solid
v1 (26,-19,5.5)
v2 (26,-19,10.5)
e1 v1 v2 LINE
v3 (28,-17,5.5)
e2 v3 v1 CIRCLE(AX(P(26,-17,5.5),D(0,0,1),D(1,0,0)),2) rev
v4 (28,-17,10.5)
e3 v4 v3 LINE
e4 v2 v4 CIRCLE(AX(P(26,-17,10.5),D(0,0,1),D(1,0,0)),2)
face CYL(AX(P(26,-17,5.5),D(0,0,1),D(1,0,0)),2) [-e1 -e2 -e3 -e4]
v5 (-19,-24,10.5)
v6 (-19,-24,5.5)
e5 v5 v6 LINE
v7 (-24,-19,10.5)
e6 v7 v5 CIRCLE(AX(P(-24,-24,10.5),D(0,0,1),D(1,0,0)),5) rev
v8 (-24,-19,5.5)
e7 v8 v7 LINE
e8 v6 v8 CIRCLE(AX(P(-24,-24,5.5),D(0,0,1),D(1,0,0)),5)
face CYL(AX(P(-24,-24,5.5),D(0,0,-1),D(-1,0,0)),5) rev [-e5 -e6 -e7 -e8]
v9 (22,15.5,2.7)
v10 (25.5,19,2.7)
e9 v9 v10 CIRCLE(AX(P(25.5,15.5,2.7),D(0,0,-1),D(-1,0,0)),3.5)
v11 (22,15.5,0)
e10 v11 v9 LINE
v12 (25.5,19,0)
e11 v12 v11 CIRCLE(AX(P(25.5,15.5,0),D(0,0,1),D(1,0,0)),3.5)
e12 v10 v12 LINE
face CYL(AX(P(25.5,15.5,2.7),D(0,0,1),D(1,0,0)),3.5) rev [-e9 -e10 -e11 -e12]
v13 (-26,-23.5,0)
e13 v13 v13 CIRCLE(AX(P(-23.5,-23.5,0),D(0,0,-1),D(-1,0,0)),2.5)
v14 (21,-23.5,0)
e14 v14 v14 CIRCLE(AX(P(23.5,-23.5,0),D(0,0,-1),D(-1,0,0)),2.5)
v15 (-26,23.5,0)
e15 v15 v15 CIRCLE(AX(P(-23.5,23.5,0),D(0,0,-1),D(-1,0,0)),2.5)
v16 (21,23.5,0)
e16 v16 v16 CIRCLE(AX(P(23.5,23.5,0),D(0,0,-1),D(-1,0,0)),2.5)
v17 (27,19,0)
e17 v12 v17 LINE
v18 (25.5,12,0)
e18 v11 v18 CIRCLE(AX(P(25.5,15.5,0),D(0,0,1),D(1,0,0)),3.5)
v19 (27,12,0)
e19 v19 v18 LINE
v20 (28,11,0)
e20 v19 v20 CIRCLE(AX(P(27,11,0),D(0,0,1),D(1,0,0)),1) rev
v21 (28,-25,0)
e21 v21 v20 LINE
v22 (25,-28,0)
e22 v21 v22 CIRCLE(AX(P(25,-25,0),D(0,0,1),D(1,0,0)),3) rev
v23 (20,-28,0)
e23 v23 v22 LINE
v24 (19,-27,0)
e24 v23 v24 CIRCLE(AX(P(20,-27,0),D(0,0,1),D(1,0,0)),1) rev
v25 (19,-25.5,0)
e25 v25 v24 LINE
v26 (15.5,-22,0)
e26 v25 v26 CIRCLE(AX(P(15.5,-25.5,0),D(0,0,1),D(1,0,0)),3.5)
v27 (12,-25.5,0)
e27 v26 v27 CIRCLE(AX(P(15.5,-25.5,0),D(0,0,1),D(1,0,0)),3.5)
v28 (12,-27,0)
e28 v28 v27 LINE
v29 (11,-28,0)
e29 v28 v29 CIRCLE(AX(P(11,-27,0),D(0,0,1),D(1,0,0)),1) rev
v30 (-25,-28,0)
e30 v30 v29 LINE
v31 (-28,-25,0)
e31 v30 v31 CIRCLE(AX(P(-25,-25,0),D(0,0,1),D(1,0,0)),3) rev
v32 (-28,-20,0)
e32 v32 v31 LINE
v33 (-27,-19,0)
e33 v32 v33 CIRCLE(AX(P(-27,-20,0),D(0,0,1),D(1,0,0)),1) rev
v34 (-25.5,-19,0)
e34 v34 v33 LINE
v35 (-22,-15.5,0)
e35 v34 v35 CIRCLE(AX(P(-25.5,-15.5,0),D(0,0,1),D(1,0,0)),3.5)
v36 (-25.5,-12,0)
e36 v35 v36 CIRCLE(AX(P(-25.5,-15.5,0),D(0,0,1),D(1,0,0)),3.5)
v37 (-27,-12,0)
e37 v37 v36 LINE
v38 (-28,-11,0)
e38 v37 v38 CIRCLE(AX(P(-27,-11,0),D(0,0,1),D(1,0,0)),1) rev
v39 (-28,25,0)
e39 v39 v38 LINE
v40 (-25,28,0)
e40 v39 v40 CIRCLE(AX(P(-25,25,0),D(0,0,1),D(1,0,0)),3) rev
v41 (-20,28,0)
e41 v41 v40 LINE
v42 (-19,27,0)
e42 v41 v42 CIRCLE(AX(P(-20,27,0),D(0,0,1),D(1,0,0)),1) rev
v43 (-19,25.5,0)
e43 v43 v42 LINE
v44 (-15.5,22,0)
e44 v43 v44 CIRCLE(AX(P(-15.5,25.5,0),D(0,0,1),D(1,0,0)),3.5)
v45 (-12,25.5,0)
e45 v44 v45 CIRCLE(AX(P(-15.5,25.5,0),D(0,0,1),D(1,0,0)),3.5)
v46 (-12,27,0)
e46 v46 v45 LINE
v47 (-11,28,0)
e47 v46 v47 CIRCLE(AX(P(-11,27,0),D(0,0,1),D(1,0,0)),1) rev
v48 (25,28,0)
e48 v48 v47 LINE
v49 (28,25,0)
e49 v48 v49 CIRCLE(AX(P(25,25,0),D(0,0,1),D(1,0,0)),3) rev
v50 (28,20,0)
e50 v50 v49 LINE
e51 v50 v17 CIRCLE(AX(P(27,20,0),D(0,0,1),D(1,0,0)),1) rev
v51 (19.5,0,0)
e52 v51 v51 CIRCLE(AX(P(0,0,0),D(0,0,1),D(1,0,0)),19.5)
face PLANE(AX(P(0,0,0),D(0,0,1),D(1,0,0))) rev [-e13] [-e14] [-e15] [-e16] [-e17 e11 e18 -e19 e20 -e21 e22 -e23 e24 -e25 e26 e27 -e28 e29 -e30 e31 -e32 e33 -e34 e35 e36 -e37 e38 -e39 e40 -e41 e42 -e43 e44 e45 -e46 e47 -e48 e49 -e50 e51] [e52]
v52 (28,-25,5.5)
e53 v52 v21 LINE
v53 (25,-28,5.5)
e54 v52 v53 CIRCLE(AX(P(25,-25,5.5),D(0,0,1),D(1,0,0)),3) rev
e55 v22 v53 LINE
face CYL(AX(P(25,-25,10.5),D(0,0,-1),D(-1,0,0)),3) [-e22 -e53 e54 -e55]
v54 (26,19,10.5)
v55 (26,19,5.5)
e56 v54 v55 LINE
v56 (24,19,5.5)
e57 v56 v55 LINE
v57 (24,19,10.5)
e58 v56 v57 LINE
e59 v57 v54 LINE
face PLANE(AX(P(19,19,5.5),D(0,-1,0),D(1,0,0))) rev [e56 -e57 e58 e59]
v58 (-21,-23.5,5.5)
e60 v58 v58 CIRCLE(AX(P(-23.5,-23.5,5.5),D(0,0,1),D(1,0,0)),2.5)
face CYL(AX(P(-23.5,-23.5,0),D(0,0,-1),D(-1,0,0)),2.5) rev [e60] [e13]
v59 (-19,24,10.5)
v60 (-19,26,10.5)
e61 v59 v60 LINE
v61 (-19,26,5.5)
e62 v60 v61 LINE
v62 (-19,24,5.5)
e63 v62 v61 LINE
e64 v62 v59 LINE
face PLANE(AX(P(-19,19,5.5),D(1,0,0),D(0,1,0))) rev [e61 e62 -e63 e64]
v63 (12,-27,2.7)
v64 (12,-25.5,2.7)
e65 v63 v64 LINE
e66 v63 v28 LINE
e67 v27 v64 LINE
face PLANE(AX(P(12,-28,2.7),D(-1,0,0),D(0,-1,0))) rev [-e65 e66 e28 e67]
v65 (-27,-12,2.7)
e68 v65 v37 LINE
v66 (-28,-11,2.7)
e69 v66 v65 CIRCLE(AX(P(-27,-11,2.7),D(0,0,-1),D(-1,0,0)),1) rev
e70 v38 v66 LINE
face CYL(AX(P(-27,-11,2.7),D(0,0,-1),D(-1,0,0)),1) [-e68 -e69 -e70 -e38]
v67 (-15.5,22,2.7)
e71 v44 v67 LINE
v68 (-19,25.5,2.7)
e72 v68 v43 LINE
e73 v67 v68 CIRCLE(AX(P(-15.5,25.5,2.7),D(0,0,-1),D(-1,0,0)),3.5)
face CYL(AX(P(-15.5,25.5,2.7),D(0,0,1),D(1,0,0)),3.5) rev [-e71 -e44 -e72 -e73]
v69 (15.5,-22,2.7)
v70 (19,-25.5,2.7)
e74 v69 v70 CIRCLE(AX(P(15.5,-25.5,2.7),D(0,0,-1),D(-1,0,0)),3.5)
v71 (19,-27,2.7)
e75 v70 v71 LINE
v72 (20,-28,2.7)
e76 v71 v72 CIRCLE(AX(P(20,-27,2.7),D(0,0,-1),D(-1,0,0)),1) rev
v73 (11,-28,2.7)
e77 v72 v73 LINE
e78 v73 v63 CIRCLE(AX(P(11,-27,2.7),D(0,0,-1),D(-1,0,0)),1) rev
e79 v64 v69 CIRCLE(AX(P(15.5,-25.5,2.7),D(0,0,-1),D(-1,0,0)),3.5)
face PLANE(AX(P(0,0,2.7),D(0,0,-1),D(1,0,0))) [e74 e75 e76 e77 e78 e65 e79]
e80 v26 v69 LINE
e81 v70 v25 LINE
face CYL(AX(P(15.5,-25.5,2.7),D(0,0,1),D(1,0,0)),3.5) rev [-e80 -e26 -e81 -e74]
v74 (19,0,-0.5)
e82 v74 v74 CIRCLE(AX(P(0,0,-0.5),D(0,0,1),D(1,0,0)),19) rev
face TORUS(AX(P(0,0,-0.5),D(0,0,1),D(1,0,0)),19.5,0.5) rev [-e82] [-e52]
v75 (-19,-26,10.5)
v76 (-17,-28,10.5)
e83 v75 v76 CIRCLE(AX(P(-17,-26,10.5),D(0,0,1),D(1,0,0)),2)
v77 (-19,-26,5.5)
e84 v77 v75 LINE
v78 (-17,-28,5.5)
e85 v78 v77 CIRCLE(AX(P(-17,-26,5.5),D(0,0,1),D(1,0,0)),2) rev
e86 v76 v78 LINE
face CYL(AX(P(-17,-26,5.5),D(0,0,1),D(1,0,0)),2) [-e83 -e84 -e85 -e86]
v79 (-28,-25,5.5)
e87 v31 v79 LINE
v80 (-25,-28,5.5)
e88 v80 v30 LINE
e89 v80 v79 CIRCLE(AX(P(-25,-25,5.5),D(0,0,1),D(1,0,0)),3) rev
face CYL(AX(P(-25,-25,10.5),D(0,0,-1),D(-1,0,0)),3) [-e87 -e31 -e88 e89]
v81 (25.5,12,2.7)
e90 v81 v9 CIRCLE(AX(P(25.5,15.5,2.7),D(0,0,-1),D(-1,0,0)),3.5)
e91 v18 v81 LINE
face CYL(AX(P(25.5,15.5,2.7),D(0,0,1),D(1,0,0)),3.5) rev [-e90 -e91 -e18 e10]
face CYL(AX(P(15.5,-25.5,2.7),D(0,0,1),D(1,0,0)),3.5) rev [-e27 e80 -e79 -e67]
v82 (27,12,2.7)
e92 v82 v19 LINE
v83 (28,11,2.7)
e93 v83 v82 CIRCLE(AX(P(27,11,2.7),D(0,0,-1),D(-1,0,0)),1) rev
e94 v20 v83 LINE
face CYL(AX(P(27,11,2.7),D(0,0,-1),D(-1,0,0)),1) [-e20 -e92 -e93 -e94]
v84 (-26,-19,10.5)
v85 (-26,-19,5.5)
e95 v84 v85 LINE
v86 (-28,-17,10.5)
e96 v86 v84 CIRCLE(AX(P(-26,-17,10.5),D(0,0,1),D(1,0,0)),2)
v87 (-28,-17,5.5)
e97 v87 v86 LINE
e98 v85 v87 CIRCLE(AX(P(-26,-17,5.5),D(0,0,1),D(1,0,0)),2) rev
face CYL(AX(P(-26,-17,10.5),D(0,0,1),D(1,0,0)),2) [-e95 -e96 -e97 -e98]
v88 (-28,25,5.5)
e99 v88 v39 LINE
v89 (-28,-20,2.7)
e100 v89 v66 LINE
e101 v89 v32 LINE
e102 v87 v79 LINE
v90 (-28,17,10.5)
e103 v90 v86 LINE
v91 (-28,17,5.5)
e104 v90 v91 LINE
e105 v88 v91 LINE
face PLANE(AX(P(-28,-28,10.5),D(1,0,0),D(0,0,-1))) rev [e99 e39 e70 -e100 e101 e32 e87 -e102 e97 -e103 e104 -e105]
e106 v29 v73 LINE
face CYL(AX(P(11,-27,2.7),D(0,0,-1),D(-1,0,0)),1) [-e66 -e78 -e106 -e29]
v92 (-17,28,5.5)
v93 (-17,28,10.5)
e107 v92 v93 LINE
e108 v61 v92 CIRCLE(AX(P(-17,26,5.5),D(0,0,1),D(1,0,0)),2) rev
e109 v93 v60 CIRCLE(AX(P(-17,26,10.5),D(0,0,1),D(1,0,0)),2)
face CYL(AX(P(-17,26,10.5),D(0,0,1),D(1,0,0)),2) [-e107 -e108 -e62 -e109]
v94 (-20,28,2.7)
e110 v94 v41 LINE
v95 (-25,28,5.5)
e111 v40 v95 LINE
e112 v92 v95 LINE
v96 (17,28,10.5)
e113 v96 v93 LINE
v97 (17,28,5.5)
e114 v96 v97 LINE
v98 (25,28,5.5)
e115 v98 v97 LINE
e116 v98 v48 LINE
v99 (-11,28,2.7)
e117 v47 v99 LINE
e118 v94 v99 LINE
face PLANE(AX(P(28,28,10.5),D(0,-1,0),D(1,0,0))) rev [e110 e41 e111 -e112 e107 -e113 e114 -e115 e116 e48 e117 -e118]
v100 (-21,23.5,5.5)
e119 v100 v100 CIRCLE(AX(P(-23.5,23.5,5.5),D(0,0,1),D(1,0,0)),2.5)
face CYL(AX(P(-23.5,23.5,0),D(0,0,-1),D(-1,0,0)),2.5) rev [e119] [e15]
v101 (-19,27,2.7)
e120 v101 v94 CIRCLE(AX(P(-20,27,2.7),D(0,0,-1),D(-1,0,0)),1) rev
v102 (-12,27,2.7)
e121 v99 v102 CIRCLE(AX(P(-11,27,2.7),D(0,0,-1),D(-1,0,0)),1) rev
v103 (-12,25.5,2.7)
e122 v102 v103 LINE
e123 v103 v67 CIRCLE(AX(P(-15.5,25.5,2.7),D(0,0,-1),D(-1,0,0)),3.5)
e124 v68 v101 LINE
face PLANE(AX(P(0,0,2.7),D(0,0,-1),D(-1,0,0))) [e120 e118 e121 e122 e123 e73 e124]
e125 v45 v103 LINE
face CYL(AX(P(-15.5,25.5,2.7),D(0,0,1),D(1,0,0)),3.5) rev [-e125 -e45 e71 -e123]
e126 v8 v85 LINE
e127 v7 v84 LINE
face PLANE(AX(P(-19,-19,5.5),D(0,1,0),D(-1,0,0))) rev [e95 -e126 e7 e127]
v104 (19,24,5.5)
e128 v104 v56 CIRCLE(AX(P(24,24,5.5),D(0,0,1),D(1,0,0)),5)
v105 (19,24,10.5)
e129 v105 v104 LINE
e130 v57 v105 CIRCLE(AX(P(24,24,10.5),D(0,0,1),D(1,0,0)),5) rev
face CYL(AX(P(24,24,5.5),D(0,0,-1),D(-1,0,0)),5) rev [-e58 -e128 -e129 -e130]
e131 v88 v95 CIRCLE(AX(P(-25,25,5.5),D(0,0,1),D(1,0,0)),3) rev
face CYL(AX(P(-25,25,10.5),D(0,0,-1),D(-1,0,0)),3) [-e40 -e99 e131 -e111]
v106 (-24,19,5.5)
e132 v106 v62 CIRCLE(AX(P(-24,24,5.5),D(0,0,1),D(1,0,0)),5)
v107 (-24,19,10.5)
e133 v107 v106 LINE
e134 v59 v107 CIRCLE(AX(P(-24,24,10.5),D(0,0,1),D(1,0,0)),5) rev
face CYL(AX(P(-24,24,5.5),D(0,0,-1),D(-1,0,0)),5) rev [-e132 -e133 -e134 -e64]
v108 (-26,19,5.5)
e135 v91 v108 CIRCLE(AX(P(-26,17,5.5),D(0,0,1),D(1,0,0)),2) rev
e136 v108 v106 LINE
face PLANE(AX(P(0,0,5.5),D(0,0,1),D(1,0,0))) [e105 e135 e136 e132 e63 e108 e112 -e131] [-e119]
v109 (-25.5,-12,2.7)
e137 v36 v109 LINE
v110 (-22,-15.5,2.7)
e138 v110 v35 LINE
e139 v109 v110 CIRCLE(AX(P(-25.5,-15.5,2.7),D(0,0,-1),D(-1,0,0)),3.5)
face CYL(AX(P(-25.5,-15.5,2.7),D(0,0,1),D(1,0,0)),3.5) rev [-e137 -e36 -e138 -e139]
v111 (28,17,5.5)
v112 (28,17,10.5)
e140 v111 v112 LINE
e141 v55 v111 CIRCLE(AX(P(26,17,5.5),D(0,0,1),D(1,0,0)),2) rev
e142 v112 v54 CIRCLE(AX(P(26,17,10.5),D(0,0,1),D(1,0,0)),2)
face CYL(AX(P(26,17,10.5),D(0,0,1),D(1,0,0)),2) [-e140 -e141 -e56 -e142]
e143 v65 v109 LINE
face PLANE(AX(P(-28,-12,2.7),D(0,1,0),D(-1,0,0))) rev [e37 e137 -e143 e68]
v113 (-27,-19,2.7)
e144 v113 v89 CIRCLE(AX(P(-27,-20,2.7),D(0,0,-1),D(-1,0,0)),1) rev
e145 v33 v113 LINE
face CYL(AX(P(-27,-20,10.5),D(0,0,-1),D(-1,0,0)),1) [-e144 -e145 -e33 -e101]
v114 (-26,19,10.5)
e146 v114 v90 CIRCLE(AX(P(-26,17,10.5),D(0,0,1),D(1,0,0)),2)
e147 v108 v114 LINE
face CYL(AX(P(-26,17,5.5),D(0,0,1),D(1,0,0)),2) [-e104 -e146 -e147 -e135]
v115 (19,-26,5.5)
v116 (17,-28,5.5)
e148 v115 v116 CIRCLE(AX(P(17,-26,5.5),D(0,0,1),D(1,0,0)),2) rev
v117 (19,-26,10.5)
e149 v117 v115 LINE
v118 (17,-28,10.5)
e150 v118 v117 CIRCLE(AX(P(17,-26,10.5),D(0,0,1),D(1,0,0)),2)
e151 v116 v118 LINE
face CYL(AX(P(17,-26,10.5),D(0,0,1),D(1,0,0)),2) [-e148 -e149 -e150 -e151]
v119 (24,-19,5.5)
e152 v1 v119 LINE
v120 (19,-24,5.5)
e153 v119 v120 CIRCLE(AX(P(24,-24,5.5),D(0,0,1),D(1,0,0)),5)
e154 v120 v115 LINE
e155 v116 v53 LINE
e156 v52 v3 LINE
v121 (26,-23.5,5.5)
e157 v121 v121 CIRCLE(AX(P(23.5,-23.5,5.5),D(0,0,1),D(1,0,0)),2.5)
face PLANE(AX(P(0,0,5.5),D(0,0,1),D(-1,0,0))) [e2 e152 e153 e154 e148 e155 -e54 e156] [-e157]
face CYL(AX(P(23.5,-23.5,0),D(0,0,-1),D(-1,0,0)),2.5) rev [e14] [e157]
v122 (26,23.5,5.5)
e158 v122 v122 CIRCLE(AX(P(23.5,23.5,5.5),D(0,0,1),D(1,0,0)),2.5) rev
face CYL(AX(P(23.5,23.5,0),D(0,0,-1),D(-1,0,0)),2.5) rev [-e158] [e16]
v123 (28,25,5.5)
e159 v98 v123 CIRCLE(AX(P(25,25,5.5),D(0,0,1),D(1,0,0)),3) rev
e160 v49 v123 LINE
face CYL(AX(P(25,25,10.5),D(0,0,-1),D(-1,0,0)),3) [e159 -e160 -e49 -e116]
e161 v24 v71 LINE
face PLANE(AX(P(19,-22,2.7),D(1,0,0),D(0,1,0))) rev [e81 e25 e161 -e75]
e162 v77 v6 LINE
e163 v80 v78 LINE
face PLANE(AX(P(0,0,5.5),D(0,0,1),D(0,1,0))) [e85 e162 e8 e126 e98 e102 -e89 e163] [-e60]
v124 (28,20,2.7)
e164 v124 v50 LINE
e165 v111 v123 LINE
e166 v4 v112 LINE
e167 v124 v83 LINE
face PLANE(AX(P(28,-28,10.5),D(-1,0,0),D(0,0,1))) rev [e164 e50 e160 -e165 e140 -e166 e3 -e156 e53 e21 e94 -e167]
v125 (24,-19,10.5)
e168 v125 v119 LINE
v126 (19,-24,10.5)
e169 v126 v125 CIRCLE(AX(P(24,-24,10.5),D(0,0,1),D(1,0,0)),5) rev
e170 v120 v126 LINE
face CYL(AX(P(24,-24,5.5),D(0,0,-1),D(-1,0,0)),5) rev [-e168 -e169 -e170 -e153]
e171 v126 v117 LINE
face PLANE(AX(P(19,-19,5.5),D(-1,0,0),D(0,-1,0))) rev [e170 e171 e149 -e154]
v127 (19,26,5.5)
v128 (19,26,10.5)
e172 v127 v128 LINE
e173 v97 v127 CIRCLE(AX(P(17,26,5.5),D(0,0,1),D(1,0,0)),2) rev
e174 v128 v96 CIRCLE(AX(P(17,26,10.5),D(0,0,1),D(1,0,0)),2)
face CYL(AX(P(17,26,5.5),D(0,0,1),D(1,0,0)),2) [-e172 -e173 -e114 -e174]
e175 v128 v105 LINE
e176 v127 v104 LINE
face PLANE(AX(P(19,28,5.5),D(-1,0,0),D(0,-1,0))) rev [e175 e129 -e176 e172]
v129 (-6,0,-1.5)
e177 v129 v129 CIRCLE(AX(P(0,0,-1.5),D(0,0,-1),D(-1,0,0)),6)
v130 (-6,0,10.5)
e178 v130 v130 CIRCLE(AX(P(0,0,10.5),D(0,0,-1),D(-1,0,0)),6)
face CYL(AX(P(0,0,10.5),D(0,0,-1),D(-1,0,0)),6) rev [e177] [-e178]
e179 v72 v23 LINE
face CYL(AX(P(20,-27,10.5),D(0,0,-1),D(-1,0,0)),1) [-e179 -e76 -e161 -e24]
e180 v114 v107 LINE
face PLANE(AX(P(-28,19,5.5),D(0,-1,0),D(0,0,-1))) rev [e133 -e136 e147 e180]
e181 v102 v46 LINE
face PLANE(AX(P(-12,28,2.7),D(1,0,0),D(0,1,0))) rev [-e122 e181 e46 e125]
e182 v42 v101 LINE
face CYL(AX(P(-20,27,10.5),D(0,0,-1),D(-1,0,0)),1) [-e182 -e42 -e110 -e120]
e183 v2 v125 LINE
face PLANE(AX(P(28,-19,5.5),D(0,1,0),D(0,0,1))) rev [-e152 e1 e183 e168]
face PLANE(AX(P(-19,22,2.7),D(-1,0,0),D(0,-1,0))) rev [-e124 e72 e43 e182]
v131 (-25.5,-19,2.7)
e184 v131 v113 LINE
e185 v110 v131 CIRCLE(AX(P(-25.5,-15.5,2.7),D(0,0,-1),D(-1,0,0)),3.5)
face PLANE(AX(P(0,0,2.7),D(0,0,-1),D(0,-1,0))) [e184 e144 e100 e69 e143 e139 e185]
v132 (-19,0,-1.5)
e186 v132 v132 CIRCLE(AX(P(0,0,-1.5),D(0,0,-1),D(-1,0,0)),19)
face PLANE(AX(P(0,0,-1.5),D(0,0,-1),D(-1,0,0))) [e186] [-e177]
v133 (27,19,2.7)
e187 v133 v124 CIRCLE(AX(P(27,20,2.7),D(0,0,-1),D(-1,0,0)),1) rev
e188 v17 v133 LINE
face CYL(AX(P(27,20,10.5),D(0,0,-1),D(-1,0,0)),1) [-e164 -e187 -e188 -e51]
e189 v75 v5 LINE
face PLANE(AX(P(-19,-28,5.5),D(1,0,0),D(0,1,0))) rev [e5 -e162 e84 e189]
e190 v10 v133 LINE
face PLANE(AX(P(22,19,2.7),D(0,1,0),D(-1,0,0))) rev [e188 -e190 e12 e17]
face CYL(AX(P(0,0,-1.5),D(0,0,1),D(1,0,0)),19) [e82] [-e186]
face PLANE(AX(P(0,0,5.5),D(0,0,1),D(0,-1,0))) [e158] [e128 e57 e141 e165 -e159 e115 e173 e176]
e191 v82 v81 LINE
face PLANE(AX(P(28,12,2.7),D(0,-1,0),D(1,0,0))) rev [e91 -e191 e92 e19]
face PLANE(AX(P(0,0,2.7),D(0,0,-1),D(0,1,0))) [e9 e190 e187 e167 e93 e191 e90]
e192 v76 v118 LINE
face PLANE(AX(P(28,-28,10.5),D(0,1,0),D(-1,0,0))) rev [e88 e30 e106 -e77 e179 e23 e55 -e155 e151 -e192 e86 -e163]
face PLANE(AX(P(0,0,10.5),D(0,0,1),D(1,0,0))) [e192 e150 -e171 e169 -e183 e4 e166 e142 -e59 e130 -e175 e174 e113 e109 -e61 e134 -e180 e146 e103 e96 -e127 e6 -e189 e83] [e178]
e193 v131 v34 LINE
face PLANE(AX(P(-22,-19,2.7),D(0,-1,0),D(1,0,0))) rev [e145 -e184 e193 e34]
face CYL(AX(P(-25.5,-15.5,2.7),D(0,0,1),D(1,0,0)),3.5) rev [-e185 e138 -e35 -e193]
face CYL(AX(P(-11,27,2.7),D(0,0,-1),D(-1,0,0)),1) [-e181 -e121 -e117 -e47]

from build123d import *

# Parameters (mm, degrees)
SKETCH1_W           = 56
SKETCH1_H           = 56
BOSS_EXTRUDE1_DEPTH = 10.5
SKETCH4_R           = 19
BOSS_EXTRUDE4_DEPTH = 1.5
FILLET1_R           = 0.5
FILLET2_R           = 3
SKETCH5_R           = 6
CUT_EXTRUDE1_DEPTH  = 42.376321731
SKETCH8_W           = 7
SKETCH8_H           = 6
CUT_EXTRUDE2_DEPTH  = 2.7
CIRPATTERN7_COUNT   = 4
FILLET5_R           = 1
FILLET6_R           = 3.5
SKETCH10_W          = 9
SKETCH10_H          = 9
CUT_EXTRUDE4_DEPTH  = 5
CIRPATTERN11_COUNT  = 4
FILLET8_R           = 2
FILLET9_R           = 5
CIRPATTERN12_COUNT  = 4


with BuildPart() as part:
    # Sketch1 → Boss-Extrude1 (new body)
    with BuildSketch(Plane.XY):
        Rectangle(SKETCH1_W, SKETCH1_H)
    extrude(amount=BOSS_EXTRUDE1_DEPTH)

    # Sketch4 → Boss-Extrude4 (add)
    with BuildSketch(Plane(origin=(0, 0, 0), x_dir=(-1, 0, 0), z_dir=(0, 0, -1))):
        with Locations(Location((0, 0, 0), (0, 0, 180))):
            Circle(SKETCH4_R)
    extrude(amount=BOSS_EXTRUDE4_DEPTH)

    # Fillet1
    fillet1_edges = [part.edges().sort_by_distance(p)[0] for p in [
        (-19, 0, 0),
    ]]
    fillet(fillet1_edges, radius=FILLET1_R)

    # Fillet2
    fillet2_edges = [part.edges().sort_by_distance(p)[0] for p in [
        (-28, 28, 5.25),
        (28, 28, 5.25),
        (28, -28, 5.25),
        (-28, -28, 5.25),
    ]]
    fillet(fillet2_edges, radius=FILLET2_R)

    # Sketch5 → Cut-Extrude1 (cut, through all)
    with BuildSketch(Plane(origin=(0, 0, -1.5), x_dir=(-1, 0, 0), z_dir=(0, 0, -1))):
        Circle(SKETCH5_R)
    extrude(amount=-CUT_EXTRUDE1_DEPTH, mode=Mode.SUBTRACT)

    # Sketch7 → Ø5.0mm Dowel Hole1 (revolve, cut)
    with BuildSketch(Plane(origin=(23.5, 23.5, 0), x_dir=(0, 1, 0), z_dir=(1, 0, 0))):
        Polygon((0, 0), (0, 18.502151548), (2.5, 17), (2.5, 0), align=None)
    f_5_0mm_dowel_hole1 = revolve(axis=Axis((23.5, 23.5, -6.35), (0, 0, 1)), mode=Mode.SUBTRACT)

    # Sketch8 → Cut-Extrude2 (cut)
    with BuildSketch(Plane(origin=(0, 0, 0), x_dir=(-1, 0, 0), z_dir=(0, 0, -1))):
        with Locations((15.5, 25)):
            Rectangle(SKETCH8_W, SKETCH8_H)
    cut_extrude2 = extrude(amount=-CUT_EXTRUDE2_DEPTH, mode=Mode.SUBTRACT)

    # CirPattern7: Cut-Extrude2 ×4 about axis
    cirpattern7_axis = Axis((0, 0, 0), (0, 0, 1))
    for i in range(1, CIRPATTERN7_COUNT):
        add(cut_extrude2.rotate(cirpattern7_axis, i * 360 / CIRPATTERN7_COUNT), mode=Mode.SUBTRACT)

    # Fillet5
    fillet5_edges = [part.edges().sort_by_distance(p)[0] for p in [
        (-28, -12, 1.35),
        (-28, -19, 1.35),
        (-12, 28, 1.35),
        (-19, 28, 1.35),
        (28, 12, 1.35),
        (28, 19, 1.35),
        (12, -28, 1.35),
        (19, -28, 1.35),
    ]]
    fillet(fillet5_edges, radius=FILLET5_R)

    # Fillet6
    fillet6_edges = [part.edges().sort_by_distance(p)[0] for p in [
        (-12, 22, 1.35),
        (-19, 22, 1.35),
        (22, 12, 1.35),
        (22, 19, 1.35),
        (12, -22, 1.35),
        (19, -22, 1.35),
        (-22, -19, 1.35),
        (-22, -12, 1.35),
    ]]
    fillet(fillet6_edges, radius=FILLET6_R - 0.0001)  # a hair under: the kernel refuses the full size

    # Sketch10 → Cut-Extrude4 (cut)
    with BuildSketch(Plane.XY.offset(10.5)):
        with Locations((-23.5, 23.5)):
            Rectangle(SKETCH10_W, SKETCH10_H)
    cut_extrude4 = extrude(amount=-CUT_EXTRUDE4_DEPTH, mode=Mode.SUBTRACT)

    # CirPattern11: Cut-Extrude4 ×4 about axis
    cirpattern11_axis = Axis((0, 0, 0), (0, 0, 1))
    for i in range(1, CIRPATTERN11_COUNT):
        add(cut_extrude4.rotate(cirpattern11_axis, i * 360 / CIRPATTERN11_COUNT), mode=Mode.SUBTRACT)

    # Fillet8
    fillet8_edges = [part.edges().sort_by_distance(p)[0] for p in [
        (-28, 19, 8),
        (-19, 28, 8),
        (19, 28, 8),
        (28, 19, 8),
        (28, -19, 8),
        (19, -28, 8),
        (-19, -28, 8),
        (-28, -19, 8),
    ]]
    fillet(fillet8_edges, radius=FILLET8_R)

    # Fillet9
    fillet9_edges = [part.edges().sort_by_distance(p)[0] for p in [
        (-19, 19, 8),
        (19, 19, 8),
        (19, -19, 8),
        (-19, -19, 8),
    ]]
    fillet(fillet9_edges, radius=FILLET9_R)

    # CirPattern12: Ø5.0mm Dowel Hole1 ×4 about axis
    cirpattern12_axis = Axis((0, 0, 0), (0, 0, 1))
    for i in range(1, CIRPATTERN12_COUNT):
        add(f_5_0mm_dowel_hole1.rotate(cirpattern12_axis, i * 360 / CIRPATTERN12_COUNT), mode=Mode.SUBTRACT)


solid = part.part
